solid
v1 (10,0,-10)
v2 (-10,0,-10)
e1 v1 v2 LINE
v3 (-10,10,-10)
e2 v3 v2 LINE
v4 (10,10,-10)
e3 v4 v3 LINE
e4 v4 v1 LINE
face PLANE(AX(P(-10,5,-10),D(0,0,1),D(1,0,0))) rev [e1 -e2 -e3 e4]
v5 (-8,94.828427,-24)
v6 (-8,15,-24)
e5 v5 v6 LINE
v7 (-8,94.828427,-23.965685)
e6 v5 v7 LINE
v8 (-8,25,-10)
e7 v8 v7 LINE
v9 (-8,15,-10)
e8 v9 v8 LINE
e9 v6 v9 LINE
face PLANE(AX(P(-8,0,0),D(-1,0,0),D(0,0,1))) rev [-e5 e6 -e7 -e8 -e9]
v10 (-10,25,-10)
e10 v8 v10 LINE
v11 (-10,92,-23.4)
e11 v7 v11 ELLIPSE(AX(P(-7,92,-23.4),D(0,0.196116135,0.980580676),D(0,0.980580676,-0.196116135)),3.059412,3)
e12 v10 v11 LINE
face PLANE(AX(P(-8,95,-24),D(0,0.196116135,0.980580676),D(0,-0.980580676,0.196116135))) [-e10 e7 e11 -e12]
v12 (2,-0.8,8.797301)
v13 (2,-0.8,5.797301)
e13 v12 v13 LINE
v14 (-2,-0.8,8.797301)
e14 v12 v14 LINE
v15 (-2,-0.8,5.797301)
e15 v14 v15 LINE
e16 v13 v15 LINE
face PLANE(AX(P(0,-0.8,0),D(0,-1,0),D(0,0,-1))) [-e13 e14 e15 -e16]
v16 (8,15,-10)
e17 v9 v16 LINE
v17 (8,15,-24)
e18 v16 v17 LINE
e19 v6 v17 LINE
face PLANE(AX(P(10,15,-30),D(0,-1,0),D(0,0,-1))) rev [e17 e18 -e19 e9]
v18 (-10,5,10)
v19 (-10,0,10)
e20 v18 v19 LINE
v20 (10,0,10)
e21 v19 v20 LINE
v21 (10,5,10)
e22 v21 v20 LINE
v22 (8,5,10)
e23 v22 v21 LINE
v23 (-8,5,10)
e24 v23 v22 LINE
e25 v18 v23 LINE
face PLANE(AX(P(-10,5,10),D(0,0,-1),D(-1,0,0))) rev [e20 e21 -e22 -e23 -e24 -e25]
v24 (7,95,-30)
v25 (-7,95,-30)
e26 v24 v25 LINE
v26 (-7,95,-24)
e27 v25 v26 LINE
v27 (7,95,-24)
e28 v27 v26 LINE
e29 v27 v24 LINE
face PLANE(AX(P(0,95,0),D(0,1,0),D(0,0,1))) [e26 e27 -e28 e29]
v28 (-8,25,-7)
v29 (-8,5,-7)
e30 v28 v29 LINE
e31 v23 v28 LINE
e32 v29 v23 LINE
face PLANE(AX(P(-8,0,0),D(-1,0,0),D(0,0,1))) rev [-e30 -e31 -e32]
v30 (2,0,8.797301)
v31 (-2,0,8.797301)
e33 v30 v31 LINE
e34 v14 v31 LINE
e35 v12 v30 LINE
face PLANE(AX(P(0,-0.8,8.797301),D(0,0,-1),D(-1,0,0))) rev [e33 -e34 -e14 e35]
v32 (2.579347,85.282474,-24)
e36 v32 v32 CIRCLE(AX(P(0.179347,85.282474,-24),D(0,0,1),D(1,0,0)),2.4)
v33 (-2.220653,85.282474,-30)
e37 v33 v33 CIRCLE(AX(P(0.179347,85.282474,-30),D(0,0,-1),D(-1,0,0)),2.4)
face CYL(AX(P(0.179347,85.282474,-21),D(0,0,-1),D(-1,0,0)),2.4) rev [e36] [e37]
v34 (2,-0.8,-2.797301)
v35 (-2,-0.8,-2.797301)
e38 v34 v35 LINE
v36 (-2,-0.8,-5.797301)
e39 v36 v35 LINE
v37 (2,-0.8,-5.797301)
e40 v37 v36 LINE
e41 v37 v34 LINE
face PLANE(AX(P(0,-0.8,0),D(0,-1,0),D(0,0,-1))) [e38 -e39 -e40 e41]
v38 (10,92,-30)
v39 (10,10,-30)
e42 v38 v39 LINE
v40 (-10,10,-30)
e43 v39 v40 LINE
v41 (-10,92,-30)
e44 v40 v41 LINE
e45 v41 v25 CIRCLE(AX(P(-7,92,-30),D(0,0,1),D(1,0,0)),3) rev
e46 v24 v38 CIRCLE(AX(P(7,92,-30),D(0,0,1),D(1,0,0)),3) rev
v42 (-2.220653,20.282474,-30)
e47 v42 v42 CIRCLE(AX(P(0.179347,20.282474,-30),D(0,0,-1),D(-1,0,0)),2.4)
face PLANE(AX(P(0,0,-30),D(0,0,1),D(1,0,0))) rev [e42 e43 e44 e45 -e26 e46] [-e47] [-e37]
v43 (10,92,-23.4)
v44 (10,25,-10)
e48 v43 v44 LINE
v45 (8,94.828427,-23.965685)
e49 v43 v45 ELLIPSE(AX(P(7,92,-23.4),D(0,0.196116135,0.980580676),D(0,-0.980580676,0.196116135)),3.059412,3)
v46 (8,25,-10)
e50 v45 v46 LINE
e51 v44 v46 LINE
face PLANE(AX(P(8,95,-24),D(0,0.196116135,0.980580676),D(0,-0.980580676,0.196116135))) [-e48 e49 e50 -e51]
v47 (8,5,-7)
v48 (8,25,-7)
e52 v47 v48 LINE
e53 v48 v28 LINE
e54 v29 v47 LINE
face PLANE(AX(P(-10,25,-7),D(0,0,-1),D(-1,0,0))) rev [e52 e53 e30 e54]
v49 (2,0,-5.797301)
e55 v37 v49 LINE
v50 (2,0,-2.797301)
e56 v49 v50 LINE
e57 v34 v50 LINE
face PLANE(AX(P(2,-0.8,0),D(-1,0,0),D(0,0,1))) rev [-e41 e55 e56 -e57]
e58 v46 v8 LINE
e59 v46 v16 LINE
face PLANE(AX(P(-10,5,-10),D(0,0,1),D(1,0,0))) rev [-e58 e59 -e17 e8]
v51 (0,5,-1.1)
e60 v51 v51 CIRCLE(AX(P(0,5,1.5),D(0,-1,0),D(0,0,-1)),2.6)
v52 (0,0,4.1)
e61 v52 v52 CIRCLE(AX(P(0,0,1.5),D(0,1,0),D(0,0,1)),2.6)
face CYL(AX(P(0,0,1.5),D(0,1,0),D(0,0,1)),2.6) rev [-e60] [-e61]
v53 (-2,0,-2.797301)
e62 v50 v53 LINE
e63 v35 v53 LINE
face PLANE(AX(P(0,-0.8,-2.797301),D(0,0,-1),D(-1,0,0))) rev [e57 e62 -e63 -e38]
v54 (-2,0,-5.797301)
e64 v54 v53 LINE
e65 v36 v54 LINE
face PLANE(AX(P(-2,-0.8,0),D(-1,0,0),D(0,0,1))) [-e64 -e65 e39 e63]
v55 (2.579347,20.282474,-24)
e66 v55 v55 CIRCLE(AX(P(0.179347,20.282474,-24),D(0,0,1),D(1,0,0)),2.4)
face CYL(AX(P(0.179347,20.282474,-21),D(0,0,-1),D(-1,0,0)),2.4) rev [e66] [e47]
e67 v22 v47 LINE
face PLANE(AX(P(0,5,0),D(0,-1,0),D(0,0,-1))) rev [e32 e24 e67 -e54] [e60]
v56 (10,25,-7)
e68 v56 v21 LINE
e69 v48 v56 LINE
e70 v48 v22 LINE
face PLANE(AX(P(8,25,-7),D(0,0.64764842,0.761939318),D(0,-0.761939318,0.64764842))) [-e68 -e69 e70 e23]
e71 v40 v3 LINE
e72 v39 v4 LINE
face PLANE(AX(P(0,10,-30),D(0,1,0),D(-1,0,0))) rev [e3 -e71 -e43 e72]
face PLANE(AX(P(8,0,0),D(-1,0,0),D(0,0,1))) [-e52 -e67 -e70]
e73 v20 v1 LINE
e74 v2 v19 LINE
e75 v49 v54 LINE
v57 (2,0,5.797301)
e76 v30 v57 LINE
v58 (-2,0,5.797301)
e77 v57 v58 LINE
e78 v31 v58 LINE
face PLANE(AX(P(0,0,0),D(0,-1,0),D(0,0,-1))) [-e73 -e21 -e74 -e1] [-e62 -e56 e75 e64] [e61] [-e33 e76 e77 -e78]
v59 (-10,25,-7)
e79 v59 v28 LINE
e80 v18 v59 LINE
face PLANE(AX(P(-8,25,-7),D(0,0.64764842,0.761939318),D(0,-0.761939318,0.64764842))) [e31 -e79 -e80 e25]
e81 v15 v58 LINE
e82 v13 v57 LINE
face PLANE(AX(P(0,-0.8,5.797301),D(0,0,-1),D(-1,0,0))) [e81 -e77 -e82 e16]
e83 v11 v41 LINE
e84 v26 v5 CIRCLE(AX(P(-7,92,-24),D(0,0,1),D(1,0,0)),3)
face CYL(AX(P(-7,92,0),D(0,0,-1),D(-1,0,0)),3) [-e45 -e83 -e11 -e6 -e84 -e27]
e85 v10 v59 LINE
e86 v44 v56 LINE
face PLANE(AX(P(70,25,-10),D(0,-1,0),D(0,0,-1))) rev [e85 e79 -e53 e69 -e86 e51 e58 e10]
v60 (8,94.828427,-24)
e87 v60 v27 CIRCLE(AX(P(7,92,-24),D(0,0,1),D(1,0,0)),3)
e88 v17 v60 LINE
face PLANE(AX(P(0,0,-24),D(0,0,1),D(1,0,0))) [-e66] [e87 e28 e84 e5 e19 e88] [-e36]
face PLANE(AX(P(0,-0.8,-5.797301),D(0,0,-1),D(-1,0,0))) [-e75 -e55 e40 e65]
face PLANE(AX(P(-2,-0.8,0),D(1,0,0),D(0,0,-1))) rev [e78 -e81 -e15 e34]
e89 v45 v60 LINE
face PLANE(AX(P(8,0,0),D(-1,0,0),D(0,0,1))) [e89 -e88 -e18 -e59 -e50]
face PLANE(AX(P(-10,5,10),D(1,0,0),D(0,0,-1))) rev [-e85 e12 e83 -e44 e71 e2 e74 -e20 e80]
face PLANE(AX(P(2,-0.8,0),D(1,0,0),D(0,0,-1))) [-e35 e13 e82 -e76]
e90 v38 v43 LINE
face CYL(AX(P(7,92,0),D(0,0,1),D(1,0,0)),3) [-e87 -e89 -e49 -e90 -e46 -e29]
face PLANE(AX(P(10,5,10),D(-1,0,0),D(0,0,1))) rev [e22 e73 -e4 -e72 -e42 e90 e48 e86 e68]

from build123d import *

# Parameters (mm, degrees)
SKETCH1_W               = 20
SKETCH1_H               = 20
BOSS_EXTRUDE1_DEPTH     = 5
SKETCH2_W               = 20
SKETCH2_H               = 3
BOSS_EXTRUDE2_DEPTH     = 20
CUT_EXTRUDE1_DEPTH      = 25.494897428
CUT_EXTRUDE1_DEPTH_BACK = 25.494897428
SKETCH3_R               = 2.6
BOSS_EXTRUDE3_DEPTH     = 2
BOSS_EXTRUDE4_DEPTH     = 2
SKETCH6_W               = 2
SKETCH6_H               = 3
SKETCH6_W_2             = 4
BOSS_EXTRUDE5_DEPTH     = 0.8
SKETCH9_W               = 20
SKETCH9_H               = 3
BOSS_EXTRUDE8_DEPTH     = 45
BOSS_EXTRUDE9_DEPTH     = 20
SKETCH13_W              = 20
SKETCH13_H              = 3
BOSS_EXTRUDE12_DEPTH    = 80
SKETCH16_W              = 3
SKETCH16_H              = 45
CUT_EXTRUDE3_DEPTH      = 80
SKETCH22_W              = 20
SKETCH22_H              = 80
BOSS_EXTRUDE15_DEPTH    = 3
BOSS_EXTRUDE16_DEPTH    = 2
BOSS_EXTRUDE17_DEPTH    = 2
FILLET2_R               = 3
SKETCH26_R              = 2.4
CUT_EXTRUDE5_DEPTH      = 9


with BuildPart() as part:
    # Sketch1 → Boss-Extrude1 (new body)
    with BuildSketch(Plane(origin=(0, 0, 0), x_dir=(1, 0, 0), z_dir=(0, 1, 0))):
        Rectangle(SKETCH1_W, SKETCH1_H)
    extrude(amount=BOSS_EXTRUDE1_DEPTH)

    # Sketch2 → Boss-Extrude2 (add)
    with BuildSketch(Plane(origin=(0, 5, 0), x_dir=(1, 0, 0), z_dir=(0, 1, 0))):
        with Locations((0, 8.5)):
            Rectangle(SKETCH2_W, SKETCH2_H)
    extrude(amount=BOSS_EXTRUDE2_DEPTH)

    # Sketch3 → Cut-Extrude1 (cut, two sides: drawn at the far end of the back side and taken through both)
    with BuildSketch(Plane(origin=(0, 5, 0), x_dir=(1, 0, 0), z_dir=(0, 1, 0)).offset(-CUT_EXTRUDE1_DEPTH_BACK)):
        with Locations(Location((0, -1.5, 0), (0, 0, 270))):
            Circle(SKETCH3_R)
    extrude(amount=CUT_EXTRUDE1_DEPTH + CUT_EXTRUDE1_DEPTH_BACK, mode=Mode.SUBTRACT)

    # Sketch4 → Boss-Extrude3 (add)
    with BuildSketch(Plane.ZY.offset(10)):
        Polygon((-7, 25), (10, 5), (-7, 5), align=None)
    extrude(amount=-BOSS_EXTRUDE3_DEPTH)

    # Sketch5 → Boss-Extrude4 (add)
    with BuildSketch(Plane(origin=(10, 0, 0), x_dir=(0, 0, -1), z_dir=(1, 0, 0))):
        Polygon((7, 25), (-10, 5), (7, 5), align=None)
    extrude(amount=-BOSS_EXTRUDE4_DEPTH)

    # Sketch6 → Boss-Extrude5 (add)
    with BuildSketch(Plane(origin=(0, 0, 0), x_dir=(-1, 0, 0), z_dir=(0, -1, 0))):
        with Locations((-1, 4.297300947)):
            Rectangle(SKETCH6_W, SKETCH6_H)
        with Locations((1, 4.297300947)):
            Rectangle(SKETCH6_W, SKETCH6_H)
        with Locations((0, -7.297300947)):
            Rectangle(SKETCH6_W_2, SKETCH6_H)
    extrude(amount=BOSS_EXTRUDE5_DEPTH)

    # Sketch9 → Boss-Extrude8 (add)
    with BuildSketch(Plane(origin=(0, 25, 0), x_dir=(1, 0, 0), z_dir=(0, 1, 0))):
        with Locations((0, 8.5)):
            Rectangle(SKETCH9_W, SKETCH9_H)
    extrude(amount=BOSS_EXTRUDE8_DEPTH)

    # Sketch12 → Boss-Extrude9 (add)
    with BuildSketch(Plane(origin=(0, 0, -10), x_dir=(-1, 0, 0), z_dir=(0, 0, -1))):
        Polygon((0, 10), (-10, 10), (-10, 15), (10, 15), (10, 10), align=None)
    extrude(amount=BOSS_EXTRUDE9_DEPTH)

    # Sketch13 → Boss-Extrude12 (add)
    with BuildSketch(Plane(origin=(0, 15, 0), x_dir=(1, 0, 0), z_dir=(0, 1, 0))):
        with Locations((0, 28.5)):
            Rectangle(SKETCH13_W, SKETCH13_H)
    extrude(amount=BOSS_EXTRUDE12_DEPTH)

    # Sketch16 → Cut-Extrude3 (cut)
    with BuildSketch(Plane.ZY.offset(10)):
        with Locations((-8.5, 47.5)):
            Rectangle(SKETCH16_W, SKETCH16_H)
    extrude(amount=-CUT_EXTRUDE3_DEPTH, mode=Mode.SUBTRACT)

    # Sketch22 → Boss-Extrude15 (add)
    with BuildSketch(Plane.XY.offset(-27)):
        with Locations((0, 55)):
            Rectangle(SKETCH22_W, SKETCH22_H)
    extrude(amount=BOSS_EXTRUDE15_DEPTH)

    # Sketch23 → Boss-Extrude16 (add)
    with BuildSketch(Plane.ZY.offset(10)):
        Polygon((-24, 95), (-10, 25), (-10, 15), (-24, 15), align=None)
    extrude(amount=-BOSS_EXTRUDE16_DEPTH)

    # Sketch24 → Boss-Extrude17 (add)
    with BuildSketch(Plane(origin=(10, 0, 0), x_dir=(0, 0, -1), z_dir=(1, 0, 0))):
        Polygon((24, 95), (10, 25), (10, 15), (24, 15), align=None)
    extrude(amount=-BOSS_EXTRUDE17_DEPTH)

    # Fillet2
    # the kernel refuses this fillet: 3 mm, written as the material it takes off along each edge
    with BuildSketch(Plane(origin=(-10, 95, -16.5), x_dir=(0, -1, 0), z_dir=(0, 0, -1)), Plane(origin=(10, 95, -37.5), x_dir=(0, -1, 0), z_dir=(0, 0, 1))) as fillet2_piece_1:
        with BuildLine():
            CenterArc((FILLET2_R, -FILLET2_R), FILLET2_R, 90, 90)
            Line((0, -FILLET2_R), (0, 0))
            Line((0, 0), (FILLET2_R, 0))
        make_face()
    extrude(amount=21, mode=Mode.SUBTRACT)

    # Sketch26 → Cut-Extrude5 (cut)
    with BuildSketch(Plane(origin=(0, 0, -30), x_dir=(-1, 0, 0), z_dir=(0, 0, -1))):
        with Locations((-0.179346542, 85.282473515)):
            Circle(SKETCH26_R)
        with Locations((-0.179346542, 20.282473515)):
            Circle(SKETCH26_R)
    extrude(amount=-CUT_EXTRUDE5_DEPTH, mode=Mode.SUBTRACT)


solid = part.part
